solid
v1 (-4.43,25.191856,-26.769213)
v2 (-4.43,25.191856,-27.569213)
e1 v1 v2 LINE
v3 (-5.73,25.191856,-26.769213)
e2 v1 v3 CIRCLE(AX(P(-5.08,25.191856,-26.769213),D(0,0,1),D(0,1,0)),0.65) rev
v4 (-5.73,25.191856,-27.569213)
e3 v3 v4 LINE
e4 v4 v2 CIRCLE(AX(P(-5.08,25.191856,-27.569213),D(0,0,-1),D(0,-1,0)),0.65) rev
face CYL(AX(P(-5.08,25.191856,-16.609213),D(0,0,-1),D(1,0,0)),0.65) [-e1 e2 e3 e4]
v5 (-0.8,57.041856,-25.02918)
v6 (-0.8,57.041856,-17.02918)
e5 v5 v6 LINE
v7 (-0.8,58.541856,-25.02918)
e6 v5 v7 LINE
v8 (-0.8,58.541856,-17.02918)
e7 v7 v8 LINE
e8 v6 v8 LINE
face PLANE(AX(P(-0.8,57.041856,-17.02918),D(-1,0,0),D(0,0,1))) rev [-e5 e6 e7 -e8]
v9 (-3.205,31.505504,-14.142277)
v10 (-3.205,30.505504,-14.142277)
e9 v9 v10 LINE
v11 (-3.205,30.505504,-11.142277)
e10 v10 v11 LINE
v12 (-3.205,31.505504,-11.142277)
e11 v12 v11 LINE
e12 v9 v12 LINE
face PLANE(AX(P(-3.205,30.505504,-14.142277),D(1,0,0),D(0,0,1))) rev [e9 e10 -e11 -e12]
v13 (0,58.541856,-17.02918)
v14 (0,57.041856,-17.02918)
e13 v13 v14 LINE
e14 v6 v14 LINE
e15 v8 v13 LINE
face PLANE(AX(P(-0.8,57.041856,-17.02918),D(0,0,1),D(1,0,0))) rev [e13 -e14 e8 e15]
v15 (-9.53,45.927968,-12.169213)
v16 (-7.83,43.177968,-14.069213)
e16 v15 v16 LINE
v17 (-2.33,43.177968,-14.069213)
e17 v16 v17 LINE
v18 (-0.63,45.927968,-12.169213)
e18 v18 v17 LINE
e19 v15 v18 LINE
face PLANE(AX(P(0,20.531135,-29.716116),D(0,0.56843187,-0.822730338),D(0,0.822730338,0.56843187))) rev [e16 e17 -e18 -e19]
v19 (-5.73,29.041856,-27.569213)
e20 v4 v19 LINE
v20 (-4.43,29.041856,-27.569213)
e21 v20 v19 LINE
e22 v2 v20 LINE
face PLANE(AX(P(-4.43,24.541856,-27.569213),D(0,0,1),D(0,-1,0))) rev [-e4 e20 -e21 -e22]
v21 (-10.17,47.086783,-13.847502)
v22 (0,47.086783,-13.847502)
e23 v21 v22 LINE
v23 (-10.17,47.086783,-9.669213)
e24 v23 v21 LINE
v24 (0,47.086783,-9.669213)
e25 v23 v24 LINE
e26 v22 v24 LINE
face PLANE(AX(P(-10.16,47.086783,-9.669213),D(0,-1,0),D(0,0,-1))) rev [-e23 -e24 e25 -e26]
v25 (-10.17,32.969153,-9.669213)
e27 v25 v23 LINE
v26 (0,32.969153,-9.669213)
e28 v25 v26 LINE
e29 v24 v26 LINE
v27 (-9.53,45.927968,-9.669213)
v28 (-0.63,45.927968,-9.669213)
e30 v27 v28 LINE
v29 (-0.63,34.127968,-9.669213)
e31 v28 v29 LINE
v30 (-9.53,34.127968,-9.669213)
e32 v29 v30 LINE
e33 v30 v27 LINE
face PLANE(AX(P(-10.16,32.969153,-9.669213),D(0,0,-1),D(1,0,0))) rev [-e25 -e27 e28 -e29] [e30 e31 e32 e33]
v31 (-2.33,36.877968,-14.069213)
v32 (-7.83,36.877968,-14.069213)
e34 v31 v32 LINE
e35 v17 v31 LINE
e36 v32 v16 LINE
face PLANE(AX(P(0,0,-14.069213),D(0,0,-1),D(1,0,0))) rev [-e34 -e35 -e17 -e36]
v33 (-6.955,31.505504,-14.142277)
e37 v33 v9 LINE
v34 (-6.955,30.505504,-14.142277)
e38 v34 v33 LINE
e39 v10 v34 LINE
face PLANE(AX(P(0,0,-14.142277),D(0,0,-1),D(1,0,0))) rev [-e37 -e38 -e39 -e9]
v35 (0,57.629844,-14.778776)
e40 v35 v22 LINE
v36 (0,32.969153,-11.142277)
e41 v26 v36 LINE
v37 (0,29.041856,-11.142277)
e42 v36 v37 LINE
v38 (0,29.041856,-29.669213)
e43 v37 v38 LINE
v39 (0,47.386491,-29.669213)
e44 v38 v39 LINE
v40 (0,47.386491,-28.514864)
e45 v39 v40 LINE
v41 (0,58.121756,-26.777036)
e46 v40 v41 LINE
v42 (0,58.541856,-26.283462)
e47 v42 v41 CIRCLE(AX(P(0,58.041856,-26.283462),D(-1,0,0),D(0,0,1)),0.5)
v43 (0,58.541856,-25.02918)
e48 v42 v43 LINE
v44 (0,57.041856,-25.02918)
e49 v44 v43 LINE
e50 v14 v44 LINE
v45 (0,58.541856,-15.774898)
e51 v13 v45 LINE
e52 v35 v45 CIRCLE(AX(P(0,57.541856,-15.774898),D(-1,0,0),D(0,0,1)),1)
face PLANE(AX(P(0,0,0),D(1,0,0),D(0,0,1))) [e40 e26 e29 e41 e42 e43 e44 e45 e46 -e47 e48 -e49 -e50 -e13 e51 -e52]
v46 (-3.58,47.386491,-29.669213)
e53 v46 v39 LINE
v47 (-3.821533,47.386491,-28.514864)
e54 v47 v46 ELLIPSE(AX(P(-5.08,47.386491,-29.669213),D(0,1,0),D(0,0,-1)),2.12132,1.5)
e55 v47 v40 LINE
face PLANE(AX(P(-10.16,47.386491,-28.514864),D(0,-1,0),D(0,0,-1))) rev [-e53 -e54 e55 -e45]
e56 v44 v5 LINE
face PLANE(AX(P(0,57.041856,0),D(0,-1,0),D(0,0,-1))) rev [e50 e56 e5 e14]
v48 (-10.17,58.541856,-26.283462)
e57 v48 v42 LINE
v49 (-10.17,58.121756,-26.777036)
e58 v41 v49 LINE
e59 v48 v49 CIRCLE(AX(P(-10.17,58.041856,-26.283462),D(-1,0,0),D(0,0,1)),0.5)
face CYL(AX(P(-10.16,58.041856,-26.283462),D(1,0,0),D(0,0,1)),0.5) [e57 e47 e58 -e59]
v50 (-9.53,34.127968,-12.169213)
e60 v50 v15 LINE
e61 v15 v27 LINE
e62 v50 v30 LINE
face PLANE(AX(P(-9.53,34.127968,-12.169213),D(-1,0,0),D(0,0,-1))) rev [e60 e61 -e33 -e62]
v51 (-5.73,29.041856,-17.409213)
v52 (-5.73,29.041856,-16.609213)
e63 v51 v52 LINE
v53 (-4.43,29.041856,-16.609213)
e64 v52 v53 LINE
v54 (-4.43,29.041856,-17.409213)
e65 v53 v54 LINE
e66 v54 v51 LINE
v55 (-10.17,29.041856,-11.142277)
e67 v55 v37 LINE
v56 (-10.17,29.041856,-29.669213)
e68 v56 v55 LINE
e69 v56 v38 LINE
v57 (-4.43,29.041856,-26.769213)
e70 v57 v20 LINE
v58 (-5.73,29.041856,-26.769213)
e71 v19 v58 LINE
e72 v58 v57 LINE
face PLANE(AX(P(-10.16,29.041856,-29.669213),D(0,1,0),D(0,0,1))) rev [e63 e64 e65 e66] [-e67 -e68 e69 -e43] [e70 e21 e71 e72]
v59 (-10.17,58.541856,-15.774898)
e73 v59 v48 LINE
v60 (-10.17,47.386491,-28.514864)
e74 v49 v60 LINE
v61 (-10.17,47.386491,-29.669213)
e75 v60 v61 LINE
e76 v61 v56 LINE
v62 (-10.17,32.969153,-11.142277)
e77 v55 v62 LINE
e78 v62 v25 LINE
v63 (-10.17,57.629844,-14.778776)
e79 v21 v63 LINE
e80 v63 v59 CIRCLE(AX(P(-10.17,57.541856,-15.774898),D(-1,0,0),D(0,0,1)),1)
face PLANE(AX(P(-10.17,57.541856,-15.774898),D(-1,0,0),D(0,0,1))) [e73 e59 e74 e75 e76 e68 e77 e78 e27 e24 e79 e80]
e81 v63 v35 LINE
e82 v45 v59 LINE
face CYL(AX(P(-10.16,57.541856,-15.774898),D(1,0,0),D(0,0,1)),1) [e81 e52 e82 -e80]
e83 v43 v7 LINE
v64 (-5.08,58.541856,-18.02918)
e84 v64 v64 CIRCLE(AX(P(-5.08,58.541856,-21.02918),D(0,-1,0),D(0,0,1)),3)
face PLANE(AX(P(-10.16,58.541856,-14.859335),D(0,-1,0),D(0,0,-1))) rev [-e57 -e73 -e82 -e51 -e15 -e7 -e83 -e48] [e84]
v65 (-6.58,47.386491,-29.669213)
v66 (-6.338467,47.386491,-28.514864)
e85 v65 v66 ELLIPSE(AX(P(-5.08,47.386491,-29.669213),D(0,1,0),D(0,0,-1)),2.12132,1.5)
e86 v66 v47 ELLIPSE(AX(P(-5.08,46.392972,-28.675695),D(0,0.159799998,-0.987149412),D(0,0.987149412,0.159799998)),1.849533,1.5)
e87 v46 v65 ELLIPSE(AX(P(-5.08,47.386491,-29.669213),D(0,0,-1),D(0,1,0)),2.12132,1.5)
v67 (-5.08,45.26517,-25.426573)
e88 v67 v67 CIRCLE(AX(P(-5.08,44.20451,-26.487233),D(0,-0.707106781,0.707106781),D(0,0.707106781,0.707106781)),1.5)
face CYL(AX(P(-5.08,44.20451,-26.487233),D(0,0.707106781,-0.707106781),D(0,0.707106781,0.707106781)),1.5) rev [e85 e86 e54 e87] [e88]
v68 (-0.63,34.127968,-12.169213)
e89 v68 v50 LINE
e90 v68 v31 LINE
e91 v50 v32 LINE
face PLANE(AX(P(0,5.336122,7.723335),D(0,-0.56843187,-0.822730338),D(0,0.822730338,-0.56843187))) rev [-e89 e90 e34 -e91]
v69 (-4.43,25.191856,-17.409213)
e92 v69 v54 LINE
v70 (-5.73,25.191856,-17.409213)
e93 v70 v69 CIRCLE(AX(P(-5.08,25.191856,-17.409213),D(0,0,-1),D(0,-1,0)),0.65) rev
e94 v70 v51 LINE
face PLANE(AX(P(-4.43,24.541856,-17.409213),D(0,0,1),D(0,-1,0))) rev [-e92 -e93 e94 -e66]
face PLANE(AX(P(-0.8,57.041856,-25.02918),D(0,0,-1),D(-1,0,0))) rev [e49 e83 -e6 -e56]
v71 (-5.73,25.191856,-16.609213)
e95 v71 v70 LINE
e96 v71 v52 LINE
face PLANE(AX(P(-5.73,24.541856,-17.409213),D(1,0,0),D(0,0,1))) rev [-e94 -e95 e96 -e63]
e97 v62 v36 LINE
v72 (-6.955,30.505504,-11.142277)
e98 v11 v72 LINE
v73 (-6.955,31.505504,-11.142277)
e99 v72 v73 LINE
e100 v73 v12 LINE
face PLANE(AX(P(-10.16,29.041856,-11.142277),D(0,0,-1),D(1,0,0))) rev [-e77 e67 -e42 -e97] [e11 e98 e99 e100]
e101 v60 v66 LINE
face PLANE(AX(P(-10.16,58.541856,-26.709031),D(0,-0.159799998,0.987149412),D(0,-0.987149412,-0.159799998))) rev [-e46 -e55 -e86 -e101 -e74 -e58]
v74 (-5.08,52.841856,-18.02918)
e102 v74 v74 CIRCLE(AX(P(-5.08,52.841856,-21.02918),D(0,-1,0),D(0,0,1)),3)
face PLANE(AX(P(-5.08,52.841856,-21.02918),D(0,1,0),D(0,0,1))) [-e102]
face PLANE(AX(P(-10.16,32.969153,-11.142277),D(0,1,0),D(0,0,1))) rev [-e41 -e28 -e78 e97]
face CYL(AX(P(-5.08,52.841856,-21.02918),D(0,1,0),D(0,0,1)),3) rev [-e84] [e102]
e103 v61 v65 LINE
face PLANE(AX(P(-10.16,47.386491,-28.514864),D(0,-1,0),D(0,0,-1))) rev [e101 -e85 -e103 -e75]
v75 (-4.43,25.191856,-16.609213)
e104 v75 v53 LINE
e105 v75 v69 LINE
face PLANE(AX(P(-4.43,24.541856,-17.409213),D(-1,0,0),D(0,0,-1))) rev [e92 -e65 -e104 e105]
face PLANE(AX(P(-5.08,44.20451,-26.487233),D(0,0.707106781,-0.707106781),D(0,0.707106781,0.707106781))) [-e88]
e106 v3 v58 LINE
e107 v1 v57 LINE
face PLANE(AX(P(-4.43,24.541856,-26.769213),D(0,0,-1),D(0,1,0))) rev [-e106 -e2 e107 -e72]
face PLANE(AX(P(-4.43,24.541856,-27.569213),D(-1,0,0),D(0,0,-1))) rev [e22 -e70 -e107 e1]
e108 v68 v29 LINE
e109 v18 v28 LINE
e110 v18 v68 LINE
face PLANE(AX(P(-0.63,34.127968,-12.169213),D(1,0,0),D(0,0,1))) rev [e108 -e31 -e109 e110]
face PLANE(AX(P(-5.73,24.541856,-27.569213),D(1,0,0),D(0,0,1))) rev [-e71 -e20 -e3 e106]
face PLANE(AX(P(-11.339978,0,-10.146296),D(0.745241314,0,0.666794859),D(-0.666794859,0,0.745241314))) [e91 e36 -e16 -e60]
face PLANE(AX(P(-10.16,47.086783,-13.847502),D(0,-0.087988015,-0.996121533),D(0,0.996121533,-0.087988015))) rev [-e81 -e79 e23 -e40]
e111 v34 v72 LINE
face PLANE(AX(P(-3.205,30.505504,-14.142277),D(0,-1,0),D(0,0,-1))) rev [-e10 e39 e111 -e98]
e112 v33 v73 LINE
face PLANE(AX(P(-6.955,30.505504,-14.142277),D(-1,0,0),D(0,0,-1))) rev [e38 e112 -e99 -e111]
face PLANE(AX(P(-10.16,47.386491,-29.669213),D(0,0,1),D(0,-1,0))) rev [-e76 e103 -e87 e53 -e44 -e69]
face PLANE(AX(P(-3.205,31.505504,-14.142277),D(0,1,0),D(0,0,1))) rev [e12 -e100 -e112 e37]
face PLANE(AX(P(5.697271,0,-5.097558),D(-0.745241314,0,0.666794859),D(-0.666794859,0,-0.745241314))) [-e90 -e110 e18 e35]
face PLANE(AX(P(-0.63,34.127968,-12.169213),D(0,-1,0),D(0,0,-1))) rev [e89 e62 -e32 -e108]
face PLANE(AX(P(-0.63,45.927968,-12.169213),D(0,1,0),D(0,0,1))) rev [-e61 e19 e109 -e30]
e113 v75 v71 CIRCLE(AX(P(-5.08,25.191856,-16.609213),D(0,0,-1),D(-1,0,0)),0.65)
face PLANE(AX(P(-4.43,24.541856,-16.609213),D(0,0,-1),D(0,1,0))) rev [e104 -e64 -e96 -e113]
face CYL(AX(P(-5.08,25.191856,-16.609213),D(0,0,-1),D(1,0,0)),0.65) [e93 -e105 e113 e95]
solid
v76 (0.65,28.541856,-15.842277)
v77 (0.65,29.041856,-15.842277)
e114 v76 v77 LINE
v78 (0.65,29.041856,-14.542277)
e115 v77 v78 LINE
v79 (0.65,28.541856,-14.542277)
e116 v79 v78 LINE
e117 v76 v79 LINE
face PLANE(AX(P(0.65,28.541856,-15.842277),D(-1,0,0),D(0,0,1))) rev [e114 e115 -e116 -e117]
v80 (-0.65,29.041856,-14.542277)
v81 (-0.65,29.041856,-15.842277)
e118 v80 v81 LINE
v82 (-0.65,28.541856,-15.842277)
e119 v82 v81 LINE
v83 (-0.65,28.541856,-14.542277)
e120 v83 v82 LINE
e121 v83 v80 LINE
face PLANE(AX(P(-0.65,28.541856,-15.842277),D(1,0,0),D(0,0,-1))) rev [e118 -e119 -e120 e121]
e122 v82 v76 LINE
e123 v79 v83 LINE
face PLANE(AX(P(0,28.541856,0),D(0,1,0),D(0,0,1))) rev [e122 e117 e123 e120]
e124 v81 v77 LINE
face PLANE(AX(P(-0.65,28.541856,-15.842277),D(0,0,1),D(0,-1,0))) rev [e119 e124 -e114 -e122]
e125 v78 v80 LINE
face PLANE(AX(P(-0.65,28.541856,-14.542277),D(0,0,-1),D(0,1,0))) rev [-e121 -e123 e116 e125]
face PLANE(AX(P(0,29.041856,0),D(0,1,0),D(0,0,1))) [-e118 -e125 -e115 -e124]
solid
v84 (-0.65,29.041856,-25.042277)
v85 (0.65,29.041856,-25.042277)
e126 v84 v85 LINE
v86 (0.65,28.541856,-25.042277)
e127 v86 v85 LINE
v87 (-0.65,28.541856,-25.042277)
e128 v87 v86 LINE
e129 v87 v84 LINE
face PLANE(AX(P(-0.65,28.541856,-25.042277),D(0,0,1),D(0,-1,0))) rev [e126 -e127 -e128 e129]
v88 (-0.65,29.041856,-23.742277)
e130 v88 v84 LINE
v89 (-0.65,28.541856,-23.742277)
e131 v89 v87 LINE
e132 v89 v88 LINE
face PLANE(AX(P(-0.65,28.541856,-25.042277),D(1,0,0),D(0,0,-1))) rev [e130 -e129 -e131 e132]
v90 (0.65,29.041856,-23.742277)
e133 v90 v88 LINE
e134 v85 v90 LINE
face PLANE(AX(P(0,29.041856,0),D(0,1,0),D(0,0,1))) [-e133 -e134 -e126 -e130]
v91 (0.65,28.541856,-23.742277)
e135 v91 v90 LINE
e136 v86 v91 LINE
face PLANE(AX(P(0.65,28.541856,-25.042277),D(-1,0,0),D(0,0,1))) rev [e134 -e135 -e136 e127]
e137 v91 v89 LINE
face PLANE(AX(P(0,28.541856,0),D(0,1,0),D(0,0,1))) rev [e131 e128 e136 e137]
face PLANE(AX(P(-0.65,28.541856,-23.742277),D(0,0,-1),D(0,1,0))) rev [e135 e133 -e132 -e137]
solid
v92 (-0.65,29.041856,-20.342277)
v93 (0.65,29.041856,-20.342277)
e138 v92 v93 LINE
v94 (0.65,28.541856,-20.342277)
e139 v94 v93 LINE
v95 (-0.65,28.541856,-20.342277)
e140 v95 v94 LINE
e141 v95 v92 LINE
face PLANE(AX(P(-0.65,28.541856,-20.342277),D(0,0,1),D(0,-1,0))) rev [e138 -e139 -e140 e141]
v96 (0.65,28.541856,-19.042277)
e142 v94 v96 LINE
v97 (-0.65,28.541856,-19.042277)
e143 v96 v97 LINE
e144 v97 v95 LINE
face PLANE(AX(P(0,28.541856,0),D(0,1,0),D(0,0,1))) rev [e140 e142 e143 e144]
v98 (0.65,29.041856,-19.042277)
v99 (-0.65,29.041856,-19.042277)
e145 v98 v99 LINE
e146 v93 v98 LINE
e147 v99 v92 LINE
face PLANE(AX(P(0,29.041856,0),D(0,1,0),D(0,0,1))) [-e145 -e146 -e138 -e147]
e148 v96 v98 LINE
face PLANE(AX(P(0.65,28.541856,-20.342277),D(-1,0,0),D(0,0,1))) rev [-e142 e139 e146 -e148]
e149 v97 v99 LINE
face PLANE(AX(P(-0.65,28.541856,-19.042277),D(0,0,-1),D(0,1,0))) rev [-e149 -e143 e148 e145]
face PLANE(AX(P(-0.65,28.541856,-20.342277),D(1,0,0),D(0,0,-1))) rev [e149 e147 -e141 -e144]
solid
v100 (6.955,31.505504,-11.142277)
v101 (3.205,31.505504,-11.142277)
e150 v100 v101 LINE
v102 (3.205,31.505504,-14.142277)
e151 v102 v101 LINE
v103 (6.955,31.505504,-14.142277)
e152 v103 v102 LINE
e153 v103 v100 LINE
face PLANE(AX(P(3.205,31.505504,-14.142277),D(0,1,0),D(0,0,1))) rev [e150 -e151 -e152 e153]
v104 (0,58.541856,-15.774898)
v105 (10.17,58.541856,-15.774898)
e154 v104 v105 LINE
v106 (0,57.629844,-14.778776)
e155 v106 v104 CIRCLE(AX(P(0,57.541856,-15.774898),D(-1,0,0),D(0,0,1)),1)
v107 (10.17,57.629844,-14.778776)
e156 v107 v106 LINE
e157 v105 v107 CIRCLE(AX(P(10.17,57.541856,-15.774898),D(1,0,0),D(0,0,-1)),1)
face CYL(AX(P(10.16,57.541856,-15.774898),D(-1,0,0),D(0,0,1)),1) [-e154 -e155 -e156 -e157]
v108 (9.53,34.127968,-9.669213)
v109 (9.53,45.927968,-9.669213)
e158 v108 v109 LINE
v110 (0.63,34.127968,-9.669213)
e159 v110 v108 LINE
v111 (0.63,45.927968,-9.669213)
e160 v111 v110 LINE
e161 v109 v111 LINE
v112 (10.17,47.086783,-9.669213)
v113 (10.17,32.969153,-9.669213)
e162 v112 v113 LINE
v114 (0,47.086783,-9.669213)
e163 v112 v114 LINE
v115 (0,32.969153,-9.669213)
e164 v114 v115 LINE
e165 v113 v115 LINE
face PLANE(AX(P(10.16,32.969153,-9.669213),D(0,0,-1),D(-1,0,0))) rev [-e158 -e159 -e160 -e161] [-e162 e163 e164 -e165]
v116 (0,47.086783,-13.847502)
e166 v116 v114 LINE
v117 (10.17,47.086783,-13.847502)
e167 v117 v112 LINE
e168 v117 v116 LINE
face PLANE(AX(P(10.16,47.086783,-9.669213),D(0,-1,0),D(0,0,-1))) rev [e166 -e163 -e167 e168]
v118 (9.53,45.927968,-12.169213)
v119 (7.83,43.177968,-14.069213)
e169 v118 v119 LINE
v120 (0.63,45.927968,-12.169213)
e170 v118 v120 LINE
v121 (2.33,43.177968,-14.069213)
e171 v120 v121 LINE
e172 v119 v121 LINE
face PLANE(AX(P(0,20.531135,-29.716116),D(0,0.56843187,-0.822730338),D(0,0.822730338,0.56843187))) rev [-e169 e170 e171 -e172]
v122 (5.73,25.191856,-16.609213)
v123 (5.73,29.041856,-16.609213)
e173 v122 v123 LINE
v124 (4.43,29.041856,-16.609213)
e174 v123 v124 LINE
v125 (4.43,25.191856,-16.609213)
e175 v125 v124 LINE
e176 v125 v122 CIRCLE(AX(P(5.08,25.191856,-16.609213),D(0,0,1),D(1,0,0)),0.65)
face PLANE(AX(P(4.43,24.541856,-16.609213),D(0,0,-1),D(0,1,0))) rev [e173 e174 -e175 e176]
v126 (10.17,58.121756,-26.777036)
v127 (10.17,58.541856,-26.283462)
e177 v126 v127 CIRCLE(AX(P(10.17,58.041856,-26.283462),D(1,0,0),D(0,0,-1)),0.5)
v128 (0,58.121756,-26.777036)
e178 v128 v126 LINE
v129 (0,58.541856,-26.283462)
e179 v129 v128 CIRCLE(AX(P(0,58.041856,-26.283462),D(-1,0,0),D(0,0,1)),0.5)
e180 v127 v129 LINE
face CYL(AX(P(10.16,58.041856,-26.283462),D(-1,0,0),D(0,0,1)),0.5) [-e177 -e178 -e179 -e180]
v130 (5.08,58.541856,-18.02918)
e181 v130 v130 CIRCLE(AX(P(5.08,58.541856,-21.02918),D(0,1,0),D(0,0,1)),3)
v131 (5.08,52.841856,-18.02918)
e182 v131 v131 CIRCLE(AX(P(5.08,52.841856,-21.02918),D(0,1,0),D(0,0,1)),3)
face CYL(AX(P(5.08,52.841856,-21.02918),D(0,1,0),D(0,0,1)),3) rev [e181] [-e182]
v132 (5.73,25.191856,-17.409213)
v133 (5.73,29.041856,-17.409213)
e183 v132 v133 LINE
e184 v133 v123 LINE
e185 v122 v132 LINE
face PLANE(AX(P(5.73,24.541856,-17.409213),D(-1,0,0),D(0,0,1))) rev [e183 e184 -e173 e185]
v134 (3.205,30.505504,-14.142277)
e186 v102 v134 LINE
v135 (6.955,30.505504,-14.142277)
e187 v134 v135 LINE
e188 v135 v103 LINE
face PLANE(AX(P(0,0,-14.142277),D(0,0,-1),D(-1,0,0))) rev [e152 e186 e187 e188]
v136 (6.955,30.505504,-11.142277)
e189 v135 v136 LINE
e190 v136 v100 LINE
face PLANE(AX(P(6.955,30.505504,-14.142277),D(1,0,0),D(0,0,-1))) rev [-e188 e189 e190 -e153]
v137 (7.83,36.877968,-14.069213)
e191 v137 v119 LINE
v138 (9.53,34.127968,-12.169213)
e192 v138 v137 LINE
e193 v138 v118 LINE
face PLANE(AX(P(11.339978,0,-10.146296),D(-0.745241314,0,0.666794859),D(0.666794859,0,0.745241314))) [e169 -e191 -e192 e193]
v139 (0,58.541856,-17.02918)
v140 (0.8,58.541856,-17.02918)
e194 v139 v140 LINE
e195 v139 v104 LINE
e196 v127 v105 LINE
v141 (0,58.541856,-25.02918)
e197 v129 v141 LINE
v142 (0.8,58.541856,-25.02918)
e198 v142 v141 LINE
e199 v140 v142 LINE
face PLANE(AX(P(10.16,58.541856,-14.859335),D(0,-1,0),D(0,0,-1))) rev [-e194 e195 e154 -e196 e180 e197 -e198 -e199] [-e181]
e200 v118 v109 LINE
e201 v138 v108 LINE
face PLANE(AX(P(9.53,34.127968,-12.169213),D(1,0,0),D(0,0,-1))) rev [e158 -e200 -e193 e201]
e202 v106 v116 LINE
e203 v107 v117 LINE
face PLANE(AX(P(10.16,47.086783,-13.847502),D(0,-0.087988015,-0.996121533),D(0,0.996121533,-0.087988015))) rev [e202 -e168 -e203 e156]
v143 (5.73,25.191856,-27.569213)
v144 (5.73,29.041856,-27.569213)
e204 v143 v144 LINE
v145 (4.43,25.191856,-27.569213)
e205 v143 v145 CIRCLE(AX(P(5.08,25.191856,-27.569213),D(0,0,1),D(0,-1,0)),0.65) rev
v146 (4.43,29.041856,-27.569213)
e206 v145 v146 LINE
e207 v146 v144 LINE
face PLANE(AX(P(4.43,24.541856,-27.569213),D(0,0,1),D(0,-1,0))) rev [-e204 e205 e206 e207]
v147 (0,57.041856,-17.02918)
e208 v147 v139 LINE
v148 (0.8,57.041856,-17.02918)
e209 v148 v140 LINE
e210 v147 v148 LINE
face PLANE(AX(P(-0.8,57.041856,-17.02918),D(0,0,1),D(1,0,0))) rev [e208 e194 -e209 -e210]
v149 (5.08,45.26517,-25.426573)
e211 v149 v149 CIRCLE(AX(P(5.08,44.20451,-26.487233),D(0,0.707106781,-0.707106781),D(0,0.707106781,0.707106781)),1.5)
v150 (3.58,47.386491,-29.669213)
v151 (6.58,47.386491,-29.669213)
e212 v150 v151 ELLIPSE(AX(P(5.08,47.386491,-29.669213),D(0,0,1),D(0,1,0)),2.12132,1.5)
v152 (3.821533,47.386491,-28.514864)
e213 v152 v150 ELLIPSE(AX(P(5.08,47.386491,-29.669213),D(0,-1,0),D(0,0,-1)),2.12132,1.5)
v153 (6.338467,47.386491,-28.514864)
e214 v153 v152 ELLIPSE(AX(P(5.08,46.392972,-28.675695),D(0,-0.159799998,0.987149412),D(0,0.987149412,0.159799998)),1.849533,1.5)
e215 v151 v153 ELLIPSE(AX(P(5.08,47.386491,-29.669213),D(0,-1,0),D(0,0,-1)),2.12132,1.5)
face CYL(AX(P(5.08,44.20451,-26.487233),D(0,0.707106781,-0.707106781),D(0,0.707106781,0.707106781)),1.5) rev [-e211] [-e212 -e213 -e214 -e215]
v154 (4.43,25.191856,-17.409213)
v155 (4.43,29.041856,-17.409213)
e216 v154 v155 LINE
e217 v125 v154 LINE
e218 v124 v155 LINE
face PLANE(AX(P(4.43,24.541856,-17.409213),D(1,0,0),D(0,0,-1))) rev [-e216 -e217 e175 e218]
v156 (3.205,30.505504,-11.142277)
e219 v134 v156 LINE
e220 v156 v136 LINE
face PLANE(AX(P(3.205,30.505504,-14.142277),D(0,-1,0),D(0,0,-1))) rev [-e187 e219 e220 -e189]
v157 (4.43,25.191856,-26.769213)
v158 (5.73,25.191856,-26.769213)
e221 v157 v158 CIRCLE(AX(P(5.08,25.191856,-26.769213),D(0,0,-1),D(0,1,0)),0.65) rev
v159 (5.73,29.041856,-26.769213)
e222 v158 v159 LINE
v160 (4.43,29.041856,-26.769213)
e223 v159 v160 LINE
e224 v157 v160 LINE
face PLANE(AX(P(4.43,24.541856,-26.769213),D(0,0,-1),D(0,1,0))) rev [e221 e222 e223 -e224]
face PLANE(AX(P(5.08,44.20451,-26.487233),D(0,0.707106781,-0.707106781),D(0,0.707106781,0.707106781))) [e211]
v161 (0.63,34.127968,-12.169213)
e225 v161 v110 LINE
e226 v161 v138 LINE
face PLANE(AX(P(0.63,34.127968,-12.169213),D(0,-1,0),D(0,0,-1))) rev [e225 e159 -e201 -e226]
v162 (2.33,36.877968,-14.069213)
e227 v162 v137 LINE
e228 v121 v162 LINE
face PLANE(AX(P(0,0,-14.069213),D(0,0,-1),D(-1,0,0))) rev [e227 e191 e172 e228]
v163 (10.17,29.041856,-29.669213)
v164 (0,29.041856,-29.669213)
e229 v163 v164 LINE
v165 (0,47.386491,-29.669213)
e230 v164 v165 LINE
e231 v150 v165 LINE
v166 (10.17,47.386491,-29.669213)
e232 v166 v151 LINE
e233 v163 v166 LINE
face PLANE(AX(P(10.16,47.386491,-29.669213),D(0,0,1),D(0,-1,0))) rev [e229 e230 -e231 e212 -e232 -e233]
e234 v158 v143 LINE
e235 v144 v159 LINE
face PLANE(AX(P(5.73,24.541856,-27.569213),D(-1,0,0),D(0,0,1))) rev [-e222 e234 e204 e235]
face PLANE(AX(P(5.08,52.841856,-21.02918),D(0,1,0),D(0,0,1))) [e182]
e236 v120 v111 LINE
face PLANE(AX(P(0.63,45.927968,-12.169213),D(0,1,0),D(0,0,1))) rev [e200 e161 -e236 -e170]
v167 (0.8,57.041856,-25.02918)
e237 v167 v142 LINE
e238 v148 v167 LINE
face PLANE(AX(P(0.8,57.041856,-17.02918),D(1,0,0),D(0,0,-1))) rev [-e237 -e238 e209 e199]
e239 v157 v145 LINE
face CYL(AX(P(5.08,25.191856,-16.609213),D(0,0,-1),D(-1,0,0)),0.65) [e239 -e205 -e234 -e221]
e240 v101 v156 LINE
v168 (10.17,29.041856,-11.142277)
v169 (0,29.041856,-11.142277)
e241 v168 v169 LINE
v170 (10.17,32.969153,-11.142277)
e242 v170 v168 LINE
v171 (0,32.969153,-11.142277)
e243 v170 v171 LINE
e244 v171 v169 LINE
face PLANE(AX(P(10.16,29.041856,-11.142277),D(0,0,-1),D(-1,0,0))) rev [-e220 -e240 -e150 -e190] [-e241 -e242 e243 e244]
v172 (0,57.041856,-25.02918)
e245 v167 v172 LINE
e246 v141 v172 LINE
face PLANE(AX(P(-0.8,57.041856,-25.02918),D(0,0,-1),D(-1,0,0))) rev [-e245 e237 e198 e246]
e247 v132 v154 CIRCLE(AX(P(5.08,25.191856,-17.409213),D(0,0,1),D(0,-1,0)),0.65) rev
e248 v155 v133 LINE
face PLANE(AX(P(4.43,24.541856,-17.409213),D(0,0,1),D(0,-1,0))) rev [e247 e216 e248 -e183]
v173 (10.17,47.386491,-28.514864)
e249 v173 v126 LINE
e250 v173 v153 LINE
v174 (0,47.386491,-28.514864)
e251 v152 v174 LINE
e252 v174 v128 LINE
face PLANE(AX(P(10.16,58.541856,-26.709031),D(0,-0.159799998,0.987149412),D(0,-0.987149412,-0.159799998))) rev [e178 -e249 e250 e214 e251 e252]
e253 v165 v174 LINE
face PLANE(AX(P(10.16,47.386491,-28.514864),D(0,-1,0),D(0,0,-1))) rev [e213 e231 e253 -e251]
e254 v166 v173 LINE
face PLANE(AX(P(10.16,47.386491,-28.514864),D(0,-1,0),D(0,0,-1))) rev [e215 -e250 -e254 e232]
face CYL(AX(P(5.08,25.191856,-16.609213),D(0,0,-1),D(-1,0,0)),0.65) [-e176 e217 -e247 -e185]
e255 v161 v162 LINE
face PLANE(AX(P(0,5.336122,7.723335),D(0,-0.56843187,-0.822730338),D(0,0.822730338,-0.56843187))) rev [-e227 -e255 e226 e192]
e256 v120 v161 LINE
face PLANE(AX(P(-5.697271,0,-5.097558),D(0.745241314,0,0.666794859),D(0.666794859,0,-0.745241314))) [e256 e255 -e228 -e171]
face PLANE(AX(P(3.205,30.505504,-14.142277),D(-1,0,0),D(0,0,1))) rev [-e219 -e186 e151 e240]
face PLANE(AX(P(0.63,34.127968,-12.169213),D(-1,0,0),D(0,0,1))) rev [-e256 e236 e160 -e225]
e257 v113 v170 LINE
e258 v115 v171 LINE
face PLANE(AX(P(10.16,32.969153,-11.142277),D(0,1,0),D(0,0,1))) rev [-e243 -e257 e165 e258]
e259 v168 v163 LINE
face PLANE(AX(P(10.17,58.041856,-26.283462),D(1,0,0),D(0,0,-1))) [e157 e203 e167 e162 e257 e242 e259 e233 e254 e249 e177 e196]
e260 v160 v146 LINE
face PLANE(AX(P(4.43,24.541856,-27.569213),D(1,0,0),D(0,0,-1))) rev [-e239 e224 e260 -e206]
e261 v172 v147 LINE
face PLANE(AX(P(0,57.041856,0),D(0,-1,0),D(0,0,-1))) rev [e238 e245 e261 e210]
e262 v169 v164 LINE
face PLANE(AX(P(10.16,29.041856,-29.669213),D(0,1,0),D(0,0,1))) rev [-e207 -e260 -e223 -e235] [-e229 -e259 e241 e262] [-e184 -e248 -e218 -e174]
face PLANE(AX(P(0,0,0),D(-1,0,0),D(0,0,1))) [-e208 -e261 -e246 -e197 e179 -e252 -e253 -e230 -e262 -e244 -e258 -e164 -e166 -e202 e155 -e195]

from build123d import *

# Parameters (mm, degrees)
BOSS_EXTRUDE1_DEPTH   = 10.16
SKETCH2_W             = 8.9
SKETCH2_H             = 11.8
CUT_EXTRUDE1_DEPTH    = 2.5
FILLET1_R             = 0.5
FILLET2_R             = 1
SKETCH5_R             = 3
CUT_EXTRUDE2_DEPTH    = 5.7
SKETCH7_W             = 1.3
SKETCH7_H             = 0.8
BOSS_EXTRUDE2_DEPTH   = 4.5
CUT_EXTRUDE5_START    = -10.96
CUT_EXTRUDE5_DEPTH    = 10.96
SKETCH10_R            = 1.5
CUT_EXTRUDE6_DEPTH    = 4.5
SKETCH13_W            = 3.75
SKETCH13_H            = 1
CUT_EXTRUDE8_DEPTH    = 3
SKETCH11_W            = 1.6
SKETCH11_H            = 8
CUT_EXTRUDE7_DEPTH    = 1.5
SKETCH12_W            = 1.3
SKETCH12_H            = 1.3
BOSS_EXTRUDE3_DEPTH   = 0.5
BOSS_EXTRUDE3_2_DEPTH = 0.5
BOSS_EXTRUDE3_3_DEPTH = 0.5
BOSS_EXTRUDE4_START   = 0.01
BOSS_EXTRUDE4_DEPTH   = 0.01
BOSS_EXTRUDE5_DEPTH   = 0.01


# Read off the part's stored shape, not the designer's step: Cut-Extrude5
with BuildPart() as part:
    # Sketch1 → Boss-Extrude1 (new body)
    with BuildSketch(Plane(origin=(0, 0, 0), x_dir=(0, 0, -1), z_dir=(1, 0, 0))):
        Polygon((9.66921347, 32.969152597), (9.66921347, 47.086783372), (13.84750154, 47.086783372), (14.859335014, 58.541856165), (26.70903057, 58.541856165), (28.514863985, 47.386490611), (29.66921347, 47.386490611), (29.66921347, 29.041856165), (11.142277404, 29.041856165), (11.142277404, 32.969152597), align=None)
    extrude(amount=BOSS_EXTRUDE1_DEPTH)

    # Sketch2 → Cut-Extrude1 (cut)
    with BuildSketch(Plane.XY.offset(-9.66921347)):
        with Locations((5.08, 40.027967985)):
            Rectangle(SKETCH2_W, SKETCH2_H)
    extrude(amount=-CUT_EXTRUDE1_DEPTH, mode=Mode.SUBTRACT)

    # Sketch3 → Cut-Loft1 section 0
    with BuildSketch(Plane.XY.offset(-12.16921347)):
        with BuildLine():
            Line((9.53, 34.127967985), (9.53, 45.927967985))
            Line((9.53, 45.927967985), (0.63, 45.927967985))
            Line((0.63, 45.927967985), (0.63, 34.127967985))
            Line((0.63, 34.127967985), (9.53, 34.127967985))
        make_face()
    # Sketch4 → Cut-Loft1 section 1
    with BuildSketch(Plane.XY.offset(-14.06921347)):
        with BuildLine():
            Line((2.33, 36.877967985), (7.83, 36.877967985))
            Line((7.83, 36.877967985), (7.83, 43.177967985))
            Line((7.83, 43.177967985), (2.33, 43.177967985))
            Line((2.33, 43.177967985), (2.33, 36.877967985))
        make_face()
    loft(mode=Mode.SUBTRACT)

    # Fillet1
    fillet1_edges = [part.edges().sort_by_distance(p)[0] for p in [
        (5.08, 58.541856165, -26.70903057),
    ]]
    fillet(fillet1_edges, radius=FILLET1_R)

    # Fillet2
    fillet2_edges = [part.edges().sort_by_distance(p)[0] for p in [
        (5.08, 58.541856165, -14.859335014),
    ]]
    fillet(fillet2_edges, radius=FILLET2_R)

    # Sketch5 → Cut-Extrude2 (cut)
    with BuildSketch(Plane(origin=(0, 58.541856165, 0), x_dir=(1, 0, 0), z_dir=(0, 1, 0))):
        with Locations(Location((5.08, 21.02917987, 0), (0, 0, 270))):
            Circle(SKETCH5_R)
    extrude(amount=-CUT_EXTRUDE2_DEPTH, mode=Mode.SUBTRACT)

    # Sketch7 → Boss-Extrude2 (add)
    with BuildSketch(Plane.XZ.offset(-29.041856165)):
        with Locations((5.08, -27.16921347)):
            Rectangle(SKETCH7_W, SKETCH7_H)
        with Locations((5.08, -17.00921347)):
            Rectangle(SKETCH7_W, SKETCH7_H)
    extrude(amount=BOSS_EXTRUDE2_DEPTH)

    # Cut-Extrude5 outline → Cut-Extrude5 (cut)
    with BuildSketch(Plane.XY.offset(-16.60921347).offset(CUT_EXTRUDE5_START)):
        with BuildLine():
            Line((5.73, 24.541856165), (5.73, 25.191856165))
            ThreePointArc((5.73, 25.191856165), (5.539619408, 24.732236757), (5.08, 24.541856165))
            Line((5.08, 24.541856165), (5.73, 24.541856165))
        make_face()
        with BuildLine():
            Line((4.43, 24.541856165), (5.08, 24.541856165))
            ThreePointArc((5.08, 24.541856165), (4.620380592, 24.732236757), (4.43, 25.191856165))
            Line((4.43, 25.191856165), (4.43, 24.541856165))
        make_face()
    extrude(amount=CUT_EXTRUDE5_DEPTH, mode=Mode.SUBTRACT)

    # Sketch10 → Cut-Extrude6 (cut)
    with BuildSketch(Plane(origin=(0, 38.527852041, -38.527852041), x_dir=(-1, 0, 0), z_dir=(0, 0.7071067811865488, -0.7071067811865464))):
        with Locations(Location((-5.08, 12.52800681, 0), (0, 0, 90))):
            Circle(SKETCH10_R)
    extrude(amount=-CUT_EXTRUDE6_DEPTH, mode=Mode.SUBTRACT)

    # Sketch13 → Cut-Extrude8 (cut)
    with BuildSketch(Plane.XY.offset(-11.142277404)):
        with Locations((5.08, 31.005504381)):
            Rectangle(SKETCH13_W, SKETCH13_H)
    extrude(amount=-CUT_EXTRUDE8_DEPTH, mode=Mode.SUBTRACT)


with BuildPart() as body_2:
    # Mirror2: mirrored copy
    add(part.part.mirror(Plane.ZY))


with BuildPart() as cut_extrude7_tool:
    # Sketch11 → Cut-Extrude7 (new body)
    with BuildSketch(Plane(origin=(0, 58.541856165, 0), x_dir=(1, 0, 0), z_dir=(0, 1, 0))):
        with Locations((0, 21.02917987)):
            Rectangle(SKETCH11_W, SKETCH11_H)
    extrude(amount=-CUT_EXTRUDE7_DEPTH)


with BuildPart() as part_1:
    add(part.part)

    # Cut-Extrude7: cut by cut_extrude7_tool
    add(cut_extrude7_tool.part, mode=Mode.SUBTRACT)

    # Sketch14 → Boss-Extrude4 (add)
    with BuildSketch(Plane(origin=(10.16, 0, 0), x_dir=(0, 0, -1), z_dir=(1, 0, 0)).offset(BOSS_EXTRUDE4_START)):
        with BuildLine():
            Line((26.28346176, 58.541856165), (15.77489798, 58.541856165))
            ThreePointArc((15.77489798, 58.541856165), (15.099615822, 58.279415659), (14.778776447, 57.629844179))
            Line((14.778776447, 57.629844179), (13.84750154, 47.086783372))
            Line((13.84750154, 47.086783372), (9.66921347, 47.086783372))
            Line((9.66921347, 47.086783372), (9.66921347, 32.969152597))
            Line((9.66921347, 32.969152597), (11.142277404, 32.969152597))
            Line((11.142277404, 32.969152597), (11.142277404, 29.041856165))
            Line((11.142277404, 29.041856165), (29.66921347, 29.041856165))
            Line((29.66921347, 29.041856165), (29.66921347, 47.386490611))
            Line((29.66921347, 47.386490611), (28.514863985, 47.386490611))
            Line((28.514863985, 47.386490611), (26.777036465, 58.121756163))
            ThreePointArc((26.777036465, 58.121756163), (26.607537368, 58.422611991), (26.28346176, 58.541856165))
        make_face()
    extrude(amount=-BOSS_EXTRUDE4_DEPTH)


with BuildPart() as body_2_1:
    add(body_2.part)

    # Cut-Extrude7: cut by cut_extrude7_tool
    add(cut_extrude7_tool.part, mode=Mode.SUBTRACT)

    # Sketch15 → Boss-Extrude5 (add)
    with BuildSketch(Plane.ZY.offset(10.16)):
        with BuildLine():
            Line((-15.77489798, 58.541856165), (-26.28346176, 58.541856165))
            ThreePointArc((-26.28346176, 58.541856165), (-26.607537368, 58.422611991), (-26.777036465, 58.121756163))
            Line((-26.777036465, 58.121756163), (-28.514863985, 47.386490611))
            Line((-28.514863985, 47.386490611), (-29.66921347, 47.386490611))
            Line((-29.66921347, 47.386490611), (-29.66921347, 29.041856165))
            Line((-29.66921347, 29.041856165), (-11.142277404, 29.041856165))
            Line((-11.142277404, 29.041856165), (-11.142277404, 32.969152597))
            Line((-11.142277404, 32.969152597), (-9.66921347, 32.969152597))
            Line((-9.66921347, 32.969152597), (-9.66921347, 47.086783372))
            Line((-9.66921347, 47.086783372), (-13.84750154, 47.086783372))
            Line((-13.84750154, 47.086783372), (-14.778776447, 57.629844179))
            ThreePointArc((-14.778776447, 57.629844179), (-15.099615822, 58.279415659), (-15.77489798, 58.541856165))
        make_face()
    extrude(amount=BOSS_EXTRUDE5_DEPTH)


with BuildPart() as body_3:
    # Sketch12 → Boss-Extrude3 (new body)
    with BuildSketch(Plane.XZ.offset(-29.041856165)):
        with Locations((0, -15.192277404)):
            Rectangle(SKETCH12_W, SKETCH12_H)
    extrude(amount=BOSS_EXTRUDE3_DEPTH)


with BuildPart() as body_4:
    # Sketch12 → Boss-Extrude3 2 (new body)
    with BuildSketch(Plane.XZ.offset(-29.041856165)):
        with Locations((0, -19.692277404)):
            Rectangle(SKETCH12_W, SKETCH12_H)
    extrude(amount=BOSS_EXTRUDE3_2_DEPTH)


with BuildPart() as body_5:
    # Sketch12 → Boss-Extrude3 3 (new body)
    with BuildSketch(Plane.XZ.offset(-29.041856165)):
        with Locations((0, -24.392277404)):
            Rectangle(SKETCH12_W, SKETCH12_H)
    extrude(amount=BOSS_EXTRUDE3_3_DEPTH)


solid = Compound([part_1.part, body_2_1.part, body_3.part, body_4.part, body_5.part])
